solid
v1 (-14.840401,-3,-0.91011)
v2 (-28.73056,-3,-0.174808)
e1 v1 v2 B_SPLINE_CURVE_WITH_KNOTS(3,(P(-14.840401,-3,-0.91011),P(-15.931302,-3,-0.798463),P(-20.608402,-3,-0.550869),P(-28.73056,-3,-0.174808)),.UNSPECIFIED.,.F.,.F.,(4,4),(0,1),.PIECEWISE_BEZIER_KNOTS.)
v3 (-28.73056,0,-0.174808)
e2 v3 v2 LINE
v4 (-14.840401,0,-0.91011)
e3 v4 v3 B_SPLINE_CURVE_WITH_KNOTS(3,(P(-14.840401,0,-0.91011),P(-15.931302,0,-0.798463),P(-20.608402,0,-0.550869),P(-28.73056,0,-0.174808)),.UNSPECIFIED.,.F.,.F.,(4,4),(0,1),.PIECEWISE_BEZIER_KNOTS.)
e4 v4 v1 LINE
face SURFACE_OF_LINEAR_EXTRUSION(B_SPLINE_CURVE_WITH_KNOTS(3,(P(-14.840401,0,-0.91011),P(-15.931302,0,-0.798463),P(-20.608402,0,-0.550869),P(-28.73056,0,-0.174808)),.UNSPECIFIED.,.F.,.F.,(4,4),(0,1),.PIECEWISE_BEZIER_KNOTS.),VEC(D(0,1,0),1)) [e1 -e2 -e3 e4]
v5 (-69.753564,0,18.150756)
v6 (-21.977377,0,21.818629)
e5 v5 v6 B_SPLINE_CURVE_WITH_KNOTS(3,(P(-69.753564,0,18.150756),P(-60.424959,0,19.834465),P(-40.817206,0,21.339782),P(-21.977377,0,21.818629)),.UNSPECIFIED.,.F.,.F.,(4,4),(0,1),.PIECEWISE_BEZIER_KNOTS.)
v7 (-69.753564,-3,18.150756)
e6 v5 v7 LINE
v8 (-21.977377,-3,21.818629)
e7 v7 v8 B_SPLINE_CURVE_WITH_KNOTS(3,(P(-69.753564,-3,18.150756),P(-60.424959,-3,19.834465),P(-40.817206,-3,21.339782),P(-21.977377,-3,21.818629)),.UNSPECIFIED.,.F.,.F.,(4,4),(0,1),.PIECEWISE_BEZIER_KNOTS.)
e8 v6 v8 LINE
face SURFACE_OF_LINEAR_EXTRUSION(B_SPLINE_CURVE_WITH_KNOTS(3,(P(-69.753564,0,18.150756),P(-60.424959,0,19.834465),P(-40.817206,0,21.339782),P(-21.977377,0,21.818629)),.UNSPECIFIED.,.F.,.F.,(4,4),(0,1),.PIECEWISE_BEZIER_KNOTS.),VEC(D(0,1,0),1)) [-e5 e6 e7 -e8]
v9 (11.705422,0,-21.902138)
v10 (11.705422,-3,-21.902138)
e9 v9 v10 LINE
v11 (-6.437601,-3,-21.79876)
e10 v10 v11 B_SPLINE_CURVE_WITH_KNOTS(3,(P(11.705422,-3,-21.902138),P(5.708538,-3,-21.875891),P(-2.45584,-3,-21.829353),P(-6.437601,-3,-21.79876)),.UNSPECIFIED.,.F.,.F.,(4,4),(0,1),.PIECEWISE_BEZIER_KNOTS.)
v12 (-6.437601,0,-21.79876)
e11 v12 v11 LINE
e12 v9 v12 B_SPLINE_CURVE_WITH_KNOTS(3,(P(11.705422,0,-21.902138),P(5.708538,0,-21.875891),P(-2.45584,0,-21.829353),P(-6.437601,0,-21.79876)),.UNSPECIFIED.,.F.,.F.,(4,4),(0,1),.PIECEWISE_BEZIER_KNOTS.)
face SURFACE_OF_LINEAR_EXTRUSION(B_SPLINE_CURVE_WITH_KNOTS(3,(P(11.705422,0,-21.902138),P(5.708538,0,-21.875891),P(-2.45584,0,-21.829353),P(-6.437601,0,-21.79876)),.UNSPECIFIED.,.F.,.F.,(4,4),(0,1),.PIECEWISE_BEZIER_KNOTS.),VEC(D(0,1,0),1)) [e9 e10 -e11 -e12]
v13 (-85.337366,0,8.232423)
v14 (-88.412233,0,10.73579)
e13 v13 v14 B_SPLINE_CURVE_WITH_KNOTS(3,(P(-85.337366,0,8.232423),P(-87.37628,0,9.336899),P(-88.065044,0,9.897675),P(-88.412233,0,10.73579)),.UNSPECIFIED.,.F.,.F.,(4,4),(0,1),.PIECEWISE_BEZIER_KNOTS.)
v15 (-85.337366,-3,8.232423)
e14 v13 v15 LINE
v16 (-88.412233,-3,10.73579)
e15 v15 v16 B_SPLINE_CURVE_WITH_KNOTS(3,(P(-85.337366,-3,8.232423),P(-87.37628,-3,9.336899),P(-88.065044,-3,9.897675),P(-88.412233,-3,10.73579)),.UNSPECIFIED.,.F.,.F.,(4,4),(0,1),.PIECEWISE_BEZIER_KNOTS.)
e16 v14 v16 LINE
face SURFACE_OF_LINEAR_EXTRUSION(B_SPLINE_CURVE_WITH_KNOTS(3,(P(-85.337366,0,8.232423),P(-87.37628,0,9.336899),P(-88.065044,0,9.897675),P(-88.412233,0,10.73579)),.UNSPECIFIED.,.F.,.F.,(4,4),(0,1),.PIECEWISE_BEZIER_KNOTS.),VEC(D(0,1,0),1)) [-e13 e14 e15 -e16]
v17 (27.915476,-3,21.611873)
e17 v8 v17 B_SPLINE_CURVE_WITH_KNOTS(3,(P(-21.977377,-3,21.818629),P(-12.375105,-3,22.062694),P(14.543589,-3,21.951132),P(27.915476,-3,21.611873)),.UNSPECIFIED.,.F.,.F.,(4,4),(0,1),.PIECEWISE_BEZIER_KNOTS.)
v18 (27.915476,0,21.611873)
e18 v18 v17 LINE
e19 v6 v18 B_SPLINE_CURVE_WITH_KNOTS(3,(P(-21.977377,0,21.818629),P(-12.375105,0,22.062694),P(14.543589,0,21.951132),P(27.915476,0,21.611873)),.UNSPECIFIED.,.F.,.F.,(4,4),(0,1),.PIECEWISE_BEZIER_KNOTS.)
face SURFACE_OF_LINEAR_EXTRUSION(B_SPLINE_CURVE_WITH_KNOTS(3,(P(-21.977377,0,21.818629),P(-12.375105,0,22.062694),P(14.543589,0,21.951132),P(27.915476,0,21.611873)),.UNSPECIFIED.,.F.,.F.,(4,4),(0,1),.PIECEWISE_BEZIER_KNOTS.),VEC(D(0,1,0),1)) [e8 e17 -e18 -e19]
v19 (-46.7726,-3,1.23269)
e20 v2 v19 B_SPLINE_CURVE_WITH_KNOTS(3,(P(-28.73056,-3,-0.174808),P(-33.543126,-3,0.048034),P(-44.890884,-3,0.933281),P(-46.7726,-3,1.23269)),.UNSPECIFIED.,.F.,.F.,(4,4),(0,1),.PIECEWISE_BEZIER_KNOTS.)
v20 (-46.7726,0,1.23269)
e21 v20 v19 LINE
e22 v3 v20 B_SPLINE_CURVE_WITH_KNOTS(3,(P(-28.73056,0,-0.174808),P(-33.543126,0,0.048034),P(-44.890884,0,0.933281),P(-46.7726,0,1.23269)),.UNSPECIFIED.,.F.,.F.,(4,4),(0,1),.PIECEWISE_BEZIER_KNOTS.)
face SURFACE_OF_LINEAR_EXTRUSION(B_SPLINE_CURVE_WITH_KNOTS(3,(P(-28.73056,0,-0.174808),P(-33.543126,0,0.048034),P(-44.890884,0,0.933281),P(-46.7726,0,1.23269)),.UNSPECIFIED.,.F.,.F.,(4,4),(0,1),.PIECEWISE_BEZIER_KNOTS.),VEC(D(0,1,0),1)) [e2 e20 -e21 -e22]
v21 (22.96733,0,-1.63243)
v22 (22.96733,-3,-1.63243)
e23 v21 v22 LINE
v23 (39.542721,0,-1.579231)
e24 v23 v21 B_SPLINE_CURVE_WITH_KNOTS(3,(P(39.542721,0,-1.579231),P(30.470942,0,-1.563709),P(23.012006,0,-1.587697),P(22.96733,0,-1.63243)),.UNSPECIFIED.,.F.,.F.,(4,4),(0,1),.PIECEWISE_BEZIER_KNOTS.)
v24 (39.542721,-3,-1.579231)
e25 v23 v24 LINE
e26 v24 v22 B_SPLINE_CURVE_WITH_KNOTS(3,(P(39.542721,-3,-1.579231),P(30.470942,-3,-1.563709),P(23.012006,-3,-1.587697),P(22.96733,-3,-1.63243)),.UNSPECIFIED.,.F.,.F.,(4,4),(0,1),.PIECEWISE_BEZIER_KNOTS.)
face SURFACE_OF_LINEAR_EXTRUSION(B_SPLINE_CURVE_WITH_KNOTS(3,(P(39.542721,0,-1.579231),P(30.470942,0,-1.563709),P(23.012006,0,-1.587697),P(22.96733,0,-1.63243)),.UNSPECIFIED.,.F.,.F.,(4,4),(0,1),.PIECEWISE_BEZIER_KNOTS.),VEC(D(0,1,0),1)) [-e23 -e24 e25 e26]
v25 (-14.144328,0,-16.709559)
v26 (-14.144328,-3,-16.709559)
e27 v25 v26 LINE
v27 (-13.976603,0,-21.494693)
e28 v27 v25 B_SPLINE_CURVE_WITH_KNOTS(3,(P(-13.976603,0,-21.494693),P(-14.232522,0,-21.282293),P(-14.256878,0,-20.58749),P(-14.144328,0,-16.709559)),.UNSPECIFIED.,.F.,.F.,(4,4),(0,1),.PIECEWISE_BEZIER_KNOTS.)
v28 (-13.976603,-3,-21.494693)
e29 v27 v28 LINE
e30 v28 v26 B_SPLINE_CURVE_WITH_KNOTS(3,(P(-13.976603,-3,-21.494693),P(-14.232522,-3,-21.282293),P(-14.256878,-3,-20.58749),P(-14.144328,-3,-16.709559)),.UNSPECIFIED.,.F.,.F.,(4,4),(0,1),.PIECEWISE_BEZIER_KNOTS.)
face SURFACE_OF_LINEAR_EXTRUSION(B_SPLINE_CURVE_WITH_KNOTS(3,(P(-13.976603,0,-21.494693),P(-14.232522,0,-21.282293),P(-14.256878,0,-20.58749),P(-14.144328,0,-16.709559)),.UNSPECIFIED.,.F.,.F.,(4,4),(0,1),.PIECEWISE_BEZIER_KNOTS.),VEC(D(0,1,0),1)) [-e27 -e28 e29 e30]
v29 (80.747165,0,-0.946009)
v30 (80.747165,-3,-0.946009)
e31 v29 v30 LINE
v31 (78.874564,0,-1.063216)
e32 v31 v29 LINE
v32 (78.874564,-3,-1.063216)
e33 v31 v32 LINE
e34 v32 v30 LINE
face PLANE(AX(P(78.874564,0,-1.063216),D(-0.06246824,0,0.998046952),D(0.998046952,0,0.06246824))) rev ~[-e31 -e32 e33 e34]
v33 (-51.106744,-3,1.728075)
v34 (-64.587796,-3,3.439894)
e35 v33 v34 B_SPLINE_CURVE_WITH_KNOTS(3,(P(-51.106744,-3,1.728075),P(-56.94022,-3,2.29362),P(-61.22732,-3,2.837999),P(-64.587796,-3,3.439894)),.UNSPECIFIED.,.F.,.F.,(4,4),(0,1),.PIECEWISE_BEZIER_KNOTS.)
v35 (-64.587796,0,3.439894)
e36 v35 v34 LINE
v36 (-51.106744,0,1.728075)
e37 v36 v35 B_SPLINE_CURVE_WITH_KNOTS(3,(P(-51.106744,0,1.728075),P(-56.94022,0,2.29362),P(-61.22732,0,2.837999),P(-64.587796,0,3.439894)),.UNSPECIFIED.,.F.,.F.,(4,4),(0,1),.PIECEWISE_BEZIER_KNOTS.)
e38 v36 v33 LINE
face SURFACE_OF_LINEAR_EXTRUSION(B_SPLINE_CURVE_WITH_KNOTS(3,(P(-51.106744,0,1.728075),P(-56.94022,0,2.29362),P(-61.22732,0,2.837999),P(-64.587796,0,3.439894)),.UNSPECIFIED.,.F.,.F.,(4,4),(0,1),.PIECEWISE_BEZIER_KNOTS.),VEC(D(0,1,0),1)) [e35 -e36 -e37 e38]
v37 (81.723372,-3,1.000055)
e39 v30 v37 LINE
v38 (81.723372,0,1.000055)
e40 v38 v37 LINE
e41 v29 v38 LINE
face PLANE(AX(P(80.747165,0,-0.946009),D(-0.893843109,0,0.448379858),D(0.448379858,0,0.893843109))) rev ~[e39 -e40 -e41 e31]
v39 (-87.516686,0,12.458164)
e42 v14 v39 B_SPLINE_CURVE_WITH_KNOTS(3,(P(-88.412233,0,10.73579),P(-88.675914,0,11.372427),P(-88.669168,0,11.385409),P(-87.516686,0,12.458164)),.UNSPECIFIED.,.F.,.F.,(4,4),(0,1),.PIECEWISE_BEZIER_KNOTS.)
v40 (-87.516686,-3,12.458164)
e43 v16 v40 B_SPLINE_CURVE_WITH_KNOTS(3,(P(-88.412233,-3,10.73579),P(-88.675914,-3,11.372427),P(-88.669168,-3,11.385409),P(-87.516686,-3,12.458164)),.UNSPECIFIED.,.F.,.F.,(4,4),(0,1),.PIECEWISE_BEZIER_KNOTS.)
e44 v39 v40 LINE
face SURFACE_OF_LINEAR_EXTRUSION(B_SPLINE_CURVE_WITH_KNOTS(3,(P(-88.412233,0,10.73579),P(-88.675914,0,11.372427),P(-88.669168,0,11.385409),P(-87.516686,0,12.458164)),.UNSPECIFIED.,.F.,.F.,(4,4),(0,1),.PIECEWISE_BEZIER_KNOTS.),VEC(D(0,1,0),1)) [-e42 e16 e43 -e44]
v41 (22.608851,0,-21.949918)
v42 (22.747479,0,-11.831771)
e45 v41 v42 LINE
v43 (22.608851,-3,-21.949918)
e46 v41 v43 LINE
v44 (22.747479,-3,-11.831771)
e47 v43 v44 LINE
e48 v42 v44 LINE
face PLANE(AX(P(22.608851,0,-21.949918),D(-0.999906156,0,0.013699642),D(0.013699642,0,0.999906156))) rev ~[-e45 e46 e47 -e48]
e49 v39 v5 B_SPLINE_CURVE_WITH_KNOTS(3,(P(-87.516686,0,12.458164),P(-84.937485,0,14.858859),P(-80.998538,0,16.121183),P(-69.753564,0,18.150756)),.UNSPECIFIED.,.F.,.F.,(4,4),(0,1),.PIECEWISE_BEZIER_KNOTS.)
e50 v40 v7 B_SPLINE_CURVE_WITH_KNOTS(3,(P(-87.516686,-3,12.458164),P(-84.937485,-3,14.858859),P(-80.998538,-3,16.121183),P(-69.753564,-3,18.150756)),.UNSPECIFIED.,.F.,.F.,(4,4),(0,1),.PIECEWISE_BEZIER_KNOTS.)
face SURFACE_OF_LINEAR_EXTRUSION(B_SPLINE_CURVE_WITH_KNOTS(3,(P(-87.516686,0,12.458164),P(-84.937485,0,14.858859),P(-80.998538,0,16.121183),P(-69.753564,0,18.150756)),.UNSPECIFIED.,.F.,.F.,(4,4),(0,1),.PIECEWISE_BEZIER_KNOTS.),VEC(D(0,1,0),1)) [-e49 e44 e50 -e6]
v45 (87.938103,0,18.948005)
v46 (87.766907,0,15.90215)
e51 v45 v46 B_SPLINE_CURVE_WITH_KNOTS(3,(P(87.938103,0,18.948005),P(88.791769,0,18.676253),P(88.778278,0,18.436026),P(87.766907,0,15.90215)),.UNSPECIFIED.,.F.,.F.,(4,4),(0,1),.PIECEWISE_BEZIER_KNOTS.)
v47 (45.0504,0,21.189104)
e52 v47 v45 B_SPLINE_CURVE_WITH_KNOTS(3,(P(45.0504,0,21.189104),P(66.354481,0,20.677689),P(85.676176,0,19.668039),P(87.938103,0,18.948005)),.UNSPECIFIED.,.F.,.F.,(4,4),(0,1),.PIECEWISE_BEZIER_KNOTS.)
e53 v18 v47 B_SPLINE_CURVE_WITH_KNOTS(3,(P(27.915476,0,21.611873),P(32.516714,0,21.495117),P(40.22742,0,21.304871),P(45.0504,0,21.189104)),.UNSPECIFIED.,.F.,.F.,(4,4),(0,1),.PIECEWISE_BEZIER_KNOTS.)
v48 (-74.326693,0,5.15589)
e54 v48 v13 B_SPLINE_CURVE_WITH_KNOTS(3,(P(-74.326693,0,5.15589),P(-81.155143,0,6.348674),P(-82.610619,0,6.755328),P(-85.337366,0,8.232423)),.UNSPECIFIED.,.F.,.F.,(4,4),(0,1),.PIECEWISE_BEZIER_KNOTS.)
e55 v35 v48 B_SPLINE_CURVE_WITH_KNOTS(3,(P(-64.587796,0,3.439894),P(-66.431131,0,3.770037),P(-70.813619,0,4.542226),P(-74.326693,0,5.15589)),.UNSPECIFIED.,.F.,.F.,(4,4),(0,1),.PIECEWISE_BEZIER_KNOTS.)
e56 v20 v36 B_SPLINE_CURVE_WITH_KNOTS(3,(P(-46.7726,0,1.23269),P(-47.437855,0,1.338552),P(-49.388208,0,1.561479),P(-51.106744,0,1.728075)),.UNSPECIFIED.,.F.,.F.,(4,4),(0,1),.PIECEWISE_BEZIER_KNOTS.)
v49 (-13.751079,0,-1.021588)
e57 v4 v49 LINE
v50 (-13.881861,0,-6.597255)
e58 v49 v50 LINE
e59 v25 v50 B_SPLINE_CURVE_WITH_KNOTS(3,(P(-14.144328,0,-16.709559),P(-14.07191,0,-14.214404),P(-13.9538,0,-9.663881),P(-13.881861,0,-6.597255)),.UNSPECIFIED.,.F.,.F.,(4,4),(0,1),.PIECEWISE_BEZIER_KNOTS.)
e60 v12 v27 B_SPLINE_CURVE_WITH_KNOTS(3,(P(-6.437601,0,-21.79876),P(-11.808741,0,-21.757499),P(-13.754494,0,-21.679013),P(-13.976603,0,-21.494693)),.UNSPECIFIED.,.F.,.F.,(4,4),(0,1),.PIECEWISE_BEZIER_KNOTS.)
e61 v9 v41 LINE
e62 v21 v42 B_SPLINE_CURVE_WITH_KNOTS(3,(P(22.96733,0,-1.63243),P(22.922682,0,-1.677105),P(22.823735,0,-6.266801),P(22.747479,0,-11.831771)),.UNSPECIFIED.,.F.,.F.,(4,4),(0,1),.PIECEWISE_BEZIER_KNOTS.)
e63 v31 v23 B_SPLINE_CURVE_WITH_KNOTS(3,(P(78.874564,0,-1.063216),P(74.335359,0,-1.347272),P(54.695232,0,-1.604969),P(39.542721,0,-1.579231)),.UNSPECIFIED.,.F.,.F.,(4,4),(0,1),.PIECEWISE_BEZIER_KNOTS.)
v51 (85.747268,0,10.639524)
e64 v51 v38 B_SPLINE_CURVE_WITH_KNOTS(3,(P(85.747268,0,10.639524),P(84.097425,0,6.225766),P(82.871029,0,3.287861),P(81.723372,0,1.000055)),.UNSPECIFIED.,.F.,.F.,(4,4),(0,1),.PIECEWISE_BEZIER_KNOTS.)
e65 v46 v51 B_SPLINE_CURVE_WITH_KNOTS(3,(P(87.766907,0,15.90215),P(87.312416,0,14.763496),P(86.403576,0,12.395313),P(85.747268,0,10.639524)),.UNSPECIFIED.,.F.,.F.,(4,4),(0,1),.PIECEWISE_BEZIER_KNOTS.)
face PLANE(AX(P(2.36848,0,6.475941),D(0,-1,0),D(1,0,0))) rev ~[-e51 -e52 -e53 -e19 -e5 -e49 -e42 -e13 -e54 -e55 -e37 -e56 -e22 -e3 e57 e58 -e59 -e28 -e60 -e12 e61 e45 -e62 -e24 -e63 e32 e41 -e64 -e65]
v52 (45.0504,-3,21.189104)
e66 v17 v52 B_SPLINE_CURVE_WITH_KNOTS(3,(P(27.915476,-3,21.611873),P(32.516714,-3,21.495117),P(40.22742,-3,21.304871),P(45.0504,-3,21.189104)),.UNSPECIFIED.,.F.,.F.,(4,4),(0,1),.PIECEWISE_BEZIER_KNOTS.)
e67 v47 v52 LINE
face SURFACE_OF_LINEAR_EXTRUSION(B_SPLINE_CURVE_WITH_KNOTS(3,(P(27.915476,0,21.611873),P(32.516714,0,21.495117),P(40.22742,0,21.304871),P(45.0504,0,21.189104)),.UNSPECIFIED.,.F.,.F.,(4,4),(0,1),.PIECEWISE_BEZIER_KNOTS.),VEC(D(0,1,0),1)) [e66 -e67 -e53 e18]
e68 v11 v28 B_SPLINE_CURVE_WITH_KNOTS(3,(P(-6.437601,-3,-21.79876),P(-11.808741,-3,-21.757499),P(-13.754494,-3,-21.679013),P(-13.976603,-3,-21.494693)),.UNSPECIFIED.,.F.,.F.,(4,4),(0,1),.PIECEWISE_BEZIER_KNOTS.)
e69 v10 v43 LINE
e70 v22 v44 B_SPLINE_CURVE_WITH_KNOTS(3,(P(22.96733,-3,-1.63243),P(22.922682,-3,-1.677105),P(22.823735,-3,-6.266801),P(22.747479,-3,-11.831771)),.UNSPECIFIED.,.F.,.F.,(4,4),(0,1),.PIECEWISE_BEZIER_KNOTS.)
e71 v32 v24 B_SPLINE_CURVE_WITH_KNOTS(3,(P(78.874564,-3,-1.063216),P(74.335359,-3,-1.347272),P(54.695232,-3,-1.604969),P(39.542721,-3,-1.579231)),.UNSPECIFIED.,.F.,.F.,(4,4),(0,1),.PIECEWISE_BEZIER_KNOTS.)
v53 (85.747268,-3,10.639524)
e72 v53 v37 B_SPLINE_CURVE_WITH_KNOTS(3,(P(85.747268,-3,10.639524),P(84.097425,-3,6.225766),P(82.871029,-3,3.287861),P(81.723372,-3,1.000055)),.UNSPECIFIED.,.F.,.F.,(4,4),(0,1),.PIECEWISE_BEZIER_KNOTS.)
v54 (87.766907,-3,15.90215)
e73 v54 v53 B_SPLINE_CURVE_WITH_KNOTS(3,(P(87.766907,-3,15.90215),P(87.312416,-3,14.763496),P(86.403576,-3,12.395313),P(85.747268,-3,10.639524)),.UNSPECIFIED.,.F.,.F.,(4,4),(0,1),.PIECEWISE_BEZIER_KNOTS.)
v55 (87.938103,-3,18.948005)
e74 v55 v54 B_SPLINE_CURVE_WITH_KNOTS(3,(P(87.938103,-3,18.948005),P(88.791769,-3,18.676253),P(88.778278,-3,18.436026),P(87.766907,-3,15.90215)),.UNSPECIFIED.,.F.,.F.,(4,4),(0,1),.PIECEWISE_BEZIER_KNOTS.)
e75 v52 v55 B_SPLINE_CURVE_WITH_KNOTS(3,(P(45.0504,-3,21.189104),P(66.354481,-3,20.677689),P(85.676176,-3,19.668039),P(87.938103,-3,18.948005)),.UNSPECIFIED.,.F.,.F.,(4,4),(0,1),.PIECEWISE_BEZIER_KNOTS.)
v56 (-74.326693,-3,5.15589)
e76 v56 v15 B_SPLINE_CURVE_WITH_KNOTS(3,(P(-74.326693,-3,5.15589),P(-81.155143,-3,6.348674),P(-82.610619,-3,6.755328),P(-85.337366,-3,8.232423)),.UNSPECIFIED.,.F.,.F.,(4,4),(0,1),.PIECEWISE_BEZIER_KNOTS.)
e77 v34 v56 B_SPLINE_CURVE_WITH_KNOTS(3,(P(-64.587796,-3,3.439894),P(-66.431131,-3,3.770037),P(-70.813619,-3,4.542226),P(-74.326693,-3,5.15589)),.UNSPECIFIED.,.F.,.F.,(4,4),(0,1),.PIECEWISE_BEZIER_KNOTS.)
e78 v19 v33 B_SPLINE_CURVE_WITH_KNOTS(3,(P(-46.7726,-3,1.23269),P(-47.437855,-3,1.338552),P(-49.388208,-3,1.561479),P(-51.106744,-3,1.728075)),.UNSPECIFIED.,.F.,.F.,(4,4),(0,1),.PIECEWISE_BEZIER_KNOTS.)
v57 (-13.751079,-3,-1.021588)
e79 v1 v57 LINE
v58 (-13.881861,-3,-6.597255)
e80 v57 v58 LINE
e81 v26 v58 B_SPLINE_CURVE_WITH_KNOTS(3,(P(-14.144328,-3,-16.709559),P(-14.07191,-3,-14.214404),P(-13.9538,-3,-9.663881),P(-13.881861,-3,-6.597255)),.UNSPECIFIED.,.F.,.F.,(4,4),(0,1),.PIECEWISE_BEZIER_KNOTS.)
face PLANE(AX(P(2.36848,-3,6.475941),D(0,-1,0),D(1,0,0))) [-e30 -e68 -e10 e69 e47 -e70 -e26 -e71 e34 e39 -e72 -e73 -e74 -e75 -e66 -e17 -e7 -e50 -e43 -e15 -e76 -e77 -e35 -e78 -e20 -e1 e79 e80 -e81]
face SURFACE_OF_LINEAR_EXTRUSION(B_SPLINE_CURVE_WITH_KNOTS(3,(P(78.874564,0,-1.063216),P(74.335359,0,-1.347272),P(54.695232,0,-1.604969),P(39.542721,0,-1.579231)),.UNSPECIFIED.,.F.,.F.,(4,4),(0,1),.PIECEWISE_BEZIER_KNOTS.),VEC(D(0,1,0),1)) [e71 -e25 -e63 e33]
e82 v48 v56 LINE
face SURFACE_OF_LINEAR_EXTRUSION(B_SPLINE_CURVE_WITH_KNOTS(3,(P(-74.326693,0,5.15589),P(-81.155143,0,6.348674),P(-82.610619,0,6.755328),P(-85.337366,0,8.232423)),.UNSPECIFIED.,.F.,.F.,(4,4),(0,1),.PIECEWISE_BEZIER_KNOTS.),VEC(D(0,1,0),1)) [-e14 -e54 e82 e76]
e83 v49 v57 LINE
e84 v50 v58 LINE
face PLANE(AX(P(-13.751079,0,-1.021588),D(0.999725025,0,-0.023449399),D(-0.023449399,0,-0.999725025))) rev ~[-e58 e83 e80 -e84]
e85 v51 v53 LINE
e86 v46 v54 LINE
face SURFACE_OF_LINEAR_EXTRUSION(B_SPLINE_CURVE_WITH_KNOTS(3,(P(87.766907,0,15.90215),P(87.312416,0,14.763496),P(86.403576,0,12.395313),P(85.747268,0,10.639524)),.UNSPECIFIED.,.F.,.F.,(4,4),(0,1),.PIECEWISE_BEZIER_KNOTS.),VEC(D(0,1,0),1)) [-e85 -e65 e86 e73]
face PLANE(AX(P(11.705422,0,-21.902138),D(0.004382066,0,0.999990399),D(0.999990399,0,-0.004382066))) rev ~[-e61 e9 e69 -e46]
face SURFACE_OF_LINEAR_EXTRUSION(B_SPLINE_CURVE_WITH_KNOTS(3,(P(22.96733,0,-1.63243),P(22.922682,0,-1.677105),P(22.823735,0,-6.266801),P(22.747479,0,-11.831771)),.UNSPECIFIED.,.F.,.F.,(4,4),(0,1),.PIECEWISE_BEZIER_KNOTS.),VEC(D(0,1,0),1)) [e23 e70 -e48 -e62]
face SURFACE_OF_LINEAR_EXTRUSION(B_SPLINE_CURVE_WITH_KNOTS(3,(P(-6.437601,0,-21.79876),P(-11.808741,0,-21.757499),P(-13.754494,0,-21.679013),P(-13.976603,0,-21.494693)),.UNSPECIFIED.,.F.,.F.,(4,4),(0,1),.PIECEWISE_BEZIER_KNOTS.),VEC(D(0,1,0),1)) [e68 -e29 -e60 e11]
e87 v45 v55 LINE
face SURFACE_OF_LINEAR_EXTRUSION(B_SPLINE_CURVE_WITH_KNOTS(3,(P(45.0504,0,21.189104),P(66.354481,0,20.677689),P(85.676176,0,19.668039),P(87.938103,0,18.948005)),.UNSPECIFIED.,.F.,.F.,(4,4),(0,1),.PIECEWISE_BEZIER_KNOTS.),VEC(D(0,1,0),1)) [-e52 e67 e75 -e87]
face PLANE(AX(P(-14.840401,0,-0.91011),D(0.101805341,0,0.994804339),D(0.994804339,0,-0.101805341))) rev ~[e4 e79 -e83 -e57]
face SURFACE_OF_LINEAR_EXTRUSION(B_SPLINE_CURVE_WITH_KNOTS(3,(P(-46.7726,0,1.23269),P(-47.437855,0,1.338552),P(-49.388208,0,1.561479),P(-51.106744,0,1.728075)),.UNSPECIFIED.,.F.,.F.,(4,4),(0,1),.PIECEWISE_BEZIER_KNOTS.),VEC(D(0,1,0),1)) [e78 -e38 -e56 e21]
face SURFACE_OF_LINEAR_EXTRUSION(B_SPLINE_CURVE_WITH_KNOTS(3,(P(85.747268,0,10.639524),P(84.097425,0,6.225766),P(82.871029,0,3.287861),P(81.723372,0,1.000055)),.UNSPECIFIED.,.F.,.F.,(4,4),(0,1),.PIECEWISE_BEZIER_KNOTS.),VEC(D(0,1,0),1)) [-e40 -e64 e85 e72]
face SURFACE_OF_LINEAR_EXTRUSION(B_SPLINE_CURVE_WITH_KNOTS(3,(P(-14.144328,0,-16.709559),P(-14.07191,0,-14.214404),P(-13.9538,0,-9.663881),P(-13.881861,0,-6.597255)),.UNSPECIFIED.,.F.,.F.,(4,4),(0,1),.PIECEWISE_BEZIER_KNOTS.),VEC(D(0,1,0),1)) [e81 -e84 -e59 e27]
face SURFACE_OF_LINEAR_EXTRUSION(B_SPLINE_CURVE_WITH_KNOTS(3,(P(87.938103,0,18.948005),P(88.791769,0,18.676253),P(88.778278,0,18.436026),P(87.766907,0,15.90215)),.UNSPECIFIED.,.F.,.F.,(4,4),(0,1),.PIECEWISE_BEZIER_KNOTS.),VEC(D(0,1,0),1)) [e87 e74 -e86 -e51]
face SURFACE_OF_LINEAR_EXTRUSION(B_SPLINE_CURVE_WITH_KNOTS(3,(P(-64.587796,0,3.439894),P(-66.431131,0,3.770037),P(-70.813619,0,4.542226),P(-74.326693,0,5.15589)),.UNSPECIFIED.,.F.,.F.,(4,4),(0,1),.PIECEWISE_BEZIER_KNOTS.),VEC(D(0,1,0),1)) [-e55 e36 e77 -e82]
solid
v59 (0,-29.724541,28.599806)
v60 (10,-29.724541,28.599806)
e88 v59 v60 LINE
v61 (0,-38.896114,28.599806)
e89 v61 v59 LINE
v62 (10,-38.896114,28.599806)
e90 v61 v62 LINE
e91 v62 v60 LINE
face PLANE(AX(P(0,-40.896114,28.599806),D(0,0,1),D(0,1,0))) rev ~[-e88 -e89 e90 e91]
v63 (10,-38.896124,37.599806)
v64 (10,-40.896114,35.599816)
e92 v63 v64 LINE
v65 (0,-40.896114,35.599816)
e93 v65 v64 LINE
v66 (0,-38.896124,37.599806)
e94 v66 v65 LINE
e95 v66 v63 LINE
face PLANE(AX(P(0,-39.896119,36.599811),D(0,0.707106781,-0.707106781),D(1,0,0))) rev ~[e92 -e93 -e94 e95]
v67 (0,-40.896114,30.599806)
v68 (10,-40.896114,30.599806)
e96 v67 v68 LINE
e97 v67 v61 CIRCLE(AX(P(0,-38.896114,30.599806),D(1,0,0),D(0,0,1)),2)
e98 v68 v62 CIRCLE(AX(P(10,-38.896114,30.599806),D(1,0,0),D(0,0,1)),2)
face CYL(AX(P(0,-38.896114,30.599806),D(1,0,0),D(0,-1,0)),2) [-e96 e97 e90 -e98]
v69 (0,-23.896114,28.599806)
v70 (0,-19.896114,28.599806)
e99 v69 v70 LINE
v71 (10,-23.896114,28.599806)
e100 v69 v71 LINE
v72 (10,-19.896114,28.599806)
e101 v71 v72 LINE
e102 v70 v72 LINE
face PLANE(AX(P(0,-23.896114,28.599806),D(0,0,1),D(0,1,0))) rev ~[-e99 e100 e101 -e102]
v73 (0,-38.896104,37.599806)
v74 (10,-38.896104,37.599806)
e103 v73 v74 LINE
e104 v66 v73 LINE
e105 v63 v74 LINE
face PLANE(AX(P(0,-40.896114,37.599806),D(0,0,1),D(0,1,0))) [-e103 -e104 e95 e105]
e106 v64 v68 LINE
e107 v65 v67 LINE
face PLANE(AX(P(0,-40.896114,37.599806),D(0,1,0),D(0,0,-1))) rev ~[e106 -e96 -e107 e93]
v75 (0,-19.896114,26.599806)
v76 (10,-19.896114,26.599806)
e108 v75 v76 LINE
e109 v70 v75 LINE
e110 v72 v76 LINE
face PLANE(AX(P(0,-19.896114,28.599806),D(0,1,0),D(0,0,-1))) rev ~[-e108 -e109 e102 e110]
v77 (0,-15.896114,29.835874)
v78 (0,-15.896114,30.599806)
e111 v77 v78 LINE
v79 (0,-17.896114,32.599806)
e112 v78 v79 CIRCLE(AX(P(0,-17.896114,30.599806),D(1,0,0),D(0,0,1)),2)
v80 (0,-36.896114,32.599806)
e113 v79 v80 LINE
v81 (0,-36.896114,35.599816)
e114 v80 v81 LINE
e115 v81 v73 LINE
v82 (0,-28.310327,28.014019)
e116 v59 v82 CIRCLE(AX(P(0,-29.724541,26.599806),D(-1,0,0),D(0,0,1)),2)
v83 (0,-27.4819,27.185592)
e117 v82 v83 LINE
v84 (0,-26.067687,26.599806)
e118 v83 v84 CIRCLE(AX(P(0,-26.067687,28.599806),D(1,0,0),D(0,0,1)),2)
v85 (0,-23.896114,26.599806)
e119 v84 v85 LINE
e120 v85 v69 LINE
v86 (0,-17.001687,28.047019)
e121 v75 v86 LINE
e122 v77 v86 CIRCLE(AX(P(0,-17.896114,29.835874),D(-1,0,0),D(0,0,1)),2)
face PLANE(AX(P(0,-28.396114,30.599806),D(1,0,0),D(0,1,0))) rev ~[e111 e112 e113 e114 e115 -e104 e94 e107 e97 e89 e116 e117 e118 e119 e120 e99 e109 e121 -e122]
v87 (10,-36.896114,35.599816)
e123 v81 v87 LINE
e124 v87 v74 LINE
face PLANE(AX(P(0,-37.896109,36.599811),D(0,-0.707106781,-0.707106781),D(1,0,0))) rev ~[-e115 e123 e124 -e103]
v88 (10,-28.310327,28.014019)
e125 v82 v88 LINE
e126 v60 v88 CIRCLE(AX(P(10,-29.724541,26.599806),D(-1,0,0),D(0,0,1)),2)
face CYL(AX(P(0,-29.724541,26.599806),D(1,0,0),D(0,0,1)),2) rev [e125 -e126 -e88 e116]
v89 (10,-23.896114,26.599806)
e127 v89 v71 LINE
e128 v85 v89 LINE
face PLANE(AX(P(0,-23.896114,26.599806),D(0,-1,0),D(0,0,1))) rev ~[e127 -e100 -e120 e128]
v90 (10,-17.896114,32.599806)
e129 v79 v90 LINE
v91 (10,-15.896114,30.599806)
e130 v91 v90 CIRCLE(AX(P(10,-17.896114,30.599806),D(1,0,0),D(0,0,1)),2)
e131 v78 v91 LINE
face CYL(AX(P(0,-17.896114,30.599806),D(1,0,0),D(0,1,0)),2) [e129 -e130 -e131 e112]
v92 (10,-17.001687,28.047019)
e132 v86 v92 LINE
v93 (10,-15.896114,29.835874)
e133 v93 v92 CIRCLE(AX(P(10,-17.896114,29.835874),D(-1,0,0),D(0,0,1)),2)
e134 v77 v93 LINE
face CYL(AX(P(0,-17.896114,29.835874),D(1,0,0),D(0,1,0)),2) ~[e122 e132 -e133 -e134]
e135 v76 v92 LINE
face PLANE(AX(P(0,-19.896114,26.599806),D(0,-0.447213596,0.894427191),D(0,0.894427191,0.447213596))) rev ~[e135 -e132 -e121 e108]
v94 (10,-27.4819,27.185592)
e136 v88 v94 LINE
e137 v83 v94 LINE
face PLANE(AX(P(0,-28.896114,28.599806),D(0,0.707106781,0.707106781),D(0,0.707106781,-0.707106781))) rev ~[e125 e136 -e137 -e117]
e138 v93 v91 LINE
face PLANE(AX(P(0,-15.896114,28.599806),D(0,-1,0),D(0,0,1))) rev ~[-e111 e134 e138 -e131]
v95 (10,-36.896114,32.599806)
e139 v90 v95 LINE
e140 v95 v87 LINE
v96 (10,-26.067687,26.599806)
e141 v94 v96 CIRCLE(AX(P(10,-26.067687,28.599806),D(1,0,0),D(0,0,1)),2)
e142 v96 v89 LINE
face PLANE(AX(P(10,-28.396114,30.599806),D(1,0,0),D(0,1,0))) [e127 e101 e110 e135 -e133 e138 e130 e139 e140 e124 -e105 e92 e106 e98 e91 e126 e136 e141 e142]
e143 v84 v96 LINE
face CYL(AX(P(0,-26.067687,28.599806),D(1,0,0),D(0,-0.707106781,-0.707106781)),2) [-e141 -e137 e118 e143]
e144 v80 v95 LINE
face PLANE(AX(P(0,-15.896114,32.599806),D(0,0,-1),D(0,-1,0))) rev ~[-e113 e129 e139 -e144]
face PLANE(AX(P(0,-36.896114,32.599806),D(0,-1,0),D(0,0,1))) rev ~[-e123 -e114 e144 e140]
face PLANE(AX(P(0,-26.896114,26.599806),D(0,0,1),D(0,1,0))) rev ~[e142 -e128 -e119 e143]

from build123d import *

# Parameters (mm, degrees)
F0_W     = 4
F0_H     = 5
F1_DEPTH = 10
F2_R     = 2
F3_SIZE  = 1.99999
F5_DEPTH = 3


# Not quite as in the source:
# - a fillet or chamfer is up to 0.001 mm smaller than in the source, because OpenCascade refuses the exact size


with BuildPart() as f1:
    # F0 (on Right) → F1 (new body)
    with BuildSketch(Plane.YZ):
        Polygon((-15.8961138576, 28.5998058021), (-15.8961138576, 32.5998058021), (-36.8961138576, 32.5998058021), (-40.8961138576, 32.5998058021), (-40.8961138576, 28.5998058021), (-28.8961138576, 28.5998058021), (-23.8961138576, 28.5998058021), (-19.8961138576, 28.5998058021), align=None)
        Polygon((-23.8961138576, 26.5998058021), (-23.8961138576, 28.5998058021), (-28.8961138576, 28.5998058021), (-26.8961138576, 26.5998058021), align=None)
        Polygon((-19.8961138576, 26.5998058021), (-15.8961138576, 28.5998058021), (-19.8961138576, 28.5998058021), align=None)
        with Locations((-38.8961138576, 35.0998058021)):
            Rectangle(F0_W, F0_H)
    extrude(amount=F1_DEPTH)

    # F2
    f2_edges = [f1.edges().sort_by_distance(p)[0] for p in [
        (5, -15.896114, 28.599806),
        (5, -26.896114, 26.599806),
        (5, -28.896114, 28.599806),
        (5, -40.896114, 28.599806),
        (5, -15.896114, 32.599806),
    ]]
    fillet(f2_edges, radius=F2_R)

    # F3 (size 2 in the source; OpenCascade refuses exactly that, so slightly less here)
    f3_edges = [f1.edges().sort_by_distance(p)[0] for p in [
        (5, -36.896114, 37.599806),
        (5, -40.896114, 37.599806),
    ]]
    chamfer(f3_edges, length=F3_SIZE)


with BuildPart() as f5:
    # F4 (on Front) → F5 (new body)
    with BuildSketch(Plane.XZ):
        with BuildLine():
            Line((-13.751079, -1.021588), (-13.881861, -6.597255))
            add(Edge.make_bspline(
                [(-14.144328, -16.709559), (-14.07191, -14.214404), (-13.9538, -9.663881), (-13.881861, -6.597255)],
                knots=[0, 0, 0, 0, 1, 1, 1, 1], degree=3))
            add(Edge.make_bspline(
                [(-13.976603, -21.494693), (-14.232522, -21.282293), (-14.256878, -20.58749), (-14.144328, -16.709559)],
                knots=[0, 0, 0, 0, 1, 1, 1, 1], degree=3))
            add(Edge.make_bspline(
                [(-6.437601, -21.79876), (-11.808741, -21.757499), (-13.754494, -21.679013), (-13.976603, -21.494693)],
                knots=[0, 0, 0, 0, 1, 1, 1, 1], degree=3))
            add(Edge.make_bspline(
                [(11.705422, -21.902138), (5.708538, -21.875891), (-2.45584, -21.829353), (-6.437601, -21.79876)],
                knots=[0, 0, 0, 0, 1, 1, 1, 1], degree=3))
            Line((11.705422, -21.902138), (22.608851, -21.949918))
            Line((22.608851, -21.949918), (22.747479, -11.831771))
            add(Edge.make_bspline(
                [(22.96733, -1.63243), (22.922682, -1.677105), (22.823735, -6.266801), (22.747479, -11.831771)],
                knots=[0, 0, 0, 0, 1, 1, 1, 1], degree=3))
            add(Edge.make_bspline(
                [(39.542721, -1.579231), (30.470942, -1.563709), (23.012006, -1.587697), (22.96733, -1.63243)],
                knots=[0, 0, 0, 0, 1, 1, 1, 1], degree=3))
            add(Edge.make_bspline(
                [(78.874564, -1.063216), (74.335359, -1.347272), (54.695232, -1.604969), (39.542721, -1.579231)],
                knots=[0, 0, 0, 0, 1, 1, 1, 1], degree=3))
            Line((78.874564, -1.063216), (80.747165, -0.946009))
            Line((80.747165, -0.946009), (81.723372, 1.000055))
            add(Edge.make_bspline(
                [(85.747268, 10.639524), (84.097425, 6.225766), (82.871029, 3.287861), (81.723372, 1.000055)],
                knots=[0, 0, 0, 0, 1, 1, 1, 1], degree=3))
            add(Edge.make_bspline(
                [(87.766907, 15.90215), (87.312416, 14.763496), (86.403576, 12.395313), (85.747268, 10.639524)],
                knots=[0, 0, 0, 0, 1, 1, 1, 1], degree=3))
            add(Edge.make_bspline(
                [(87.938103, 18.948005), (88.791769, 18.676253), (88.778278, 18.436026), (87.766907, 15.90215)],
                knots=[0, 0, 0, 0, 1, 1, 1, 1], degree=3))
            add(Edge.make_bspline(
                [(45.0504, 21.189104), (66.354481, 20.677689), (85.676176, 19.668039), (87.938103, 18.948005)],
                knots=[0, 0, 0, 0, 1, 1, 1, 1], degree=3))
            add(Edge.make_bspline(
                [(27.915476, 21.611873), (32.516714, 21.495117), (40.22742, 21.304871), (45.0504, 21.189104)],
                knots=[0, 0, 0, 0, 1, 1, 1, 1], degree=3))
            add(Edge.make_bspline(
                [(-21.977377, 21.818629), (-12.375105, 22.062694), (14.543589, 21.951132), (27.915476, 21.611873)],
                knots=[0, 0, 0, 0, 1, 1, 1, 1], degree=3))
            add(Edge.make_bspline(
                [(-69.753564, 18.150756), (-60.424959, 19.834465), (-40.817206, 21.339782), (-21.977377, 21.818629)],
                knots=[0, 0, 0, 0, 1, 1, 1, 1], degree=3))
            add(Edge.make_bspline(
                [(-87.516686, 12.458164), (-84.937485, 14.858859), (-80.998538, 16.121183), (-69.753564, 18.150756)],
                knots=[0, 0, 0, 0, 1, 1, 1, 1], degree=3))
            add(Edge.make_bspline(
                [(-88.412233, 10.73579), (-88.675914, 11.372427), (-88.669168, 11.385409), (-87.516686, 12.458164)],
                knots=[0, 0, 0, 0, 1, 1, 1, 1], degree=3))
            add(Edge.make_bspline(
                [(-85.337366, 8.232423), (-87.37628, 9.336899), (-88.065044, 9.897675), (-88.412233, 10.73579)],
                knots=[0, 0, 0, 0, 1, 1, 1, 1], degree=3))
            add(Edge.make_bspline(
                [(-74.326693, 5.15589), (-81.155143, 6.348674), (-82.610619, 6.755328), (-85.337366, 8.232423)],
                knots=[0, 0, 0, 0, 1, 1, 1, 1], degree=3))
            add(Edge.make_bspline(
                [(-64.587796, 3.439894), (-66.431131, 3.770037), (-70.813619, 4.542226), (-74.326693, 5.15589)],
                knots=[0, 0, 0, 0, 1, 1, 1, 1], degree=3))
            add(Edge.make_bspline(
                [(-51.106744, 1.728075), (-56.94022, 2.29362), (-61.22732, 2.837999), (-64.587796, 3.439894)],
                knots=[0, 0, 0, 0, 1, 1, 1, 1], degree=3))
            add(Edge.make_bspline(
                [(-46.7726, 1.23269), (-47.437855, 1.338552), (-49.388208, 1.561479), (-51.106744, 1.728075)],
                knots=[0, 0, 0, 0, 1, 1, 1, 1], degree=3))
            add(Edge.make_bspline(
                [(-28.73056, -0.174808), (-33.543126, 0.048034), (-44.890884, 0.933281), (-46.7726, 1.23269)],
                knots=[0, 0, 0, 0, 1, 1, 1, 1], degree=3))
            add(Edge.make_bspline(
                [(-14.840401, -0.91011), (-15.931302, -0.798463), (-20.608402, -0.550869), (-28.73056, -0.174808)],
                knots=[0, 0, 0, 0, 1, 1, 1, 1], degree=3))
            Line((-14.840401, -0.91011), (-13.751079, -1.021588))
        make_face()
    extrude(amount=F5_DEPTH)


solid = Compound([f1.part, f5.part])
